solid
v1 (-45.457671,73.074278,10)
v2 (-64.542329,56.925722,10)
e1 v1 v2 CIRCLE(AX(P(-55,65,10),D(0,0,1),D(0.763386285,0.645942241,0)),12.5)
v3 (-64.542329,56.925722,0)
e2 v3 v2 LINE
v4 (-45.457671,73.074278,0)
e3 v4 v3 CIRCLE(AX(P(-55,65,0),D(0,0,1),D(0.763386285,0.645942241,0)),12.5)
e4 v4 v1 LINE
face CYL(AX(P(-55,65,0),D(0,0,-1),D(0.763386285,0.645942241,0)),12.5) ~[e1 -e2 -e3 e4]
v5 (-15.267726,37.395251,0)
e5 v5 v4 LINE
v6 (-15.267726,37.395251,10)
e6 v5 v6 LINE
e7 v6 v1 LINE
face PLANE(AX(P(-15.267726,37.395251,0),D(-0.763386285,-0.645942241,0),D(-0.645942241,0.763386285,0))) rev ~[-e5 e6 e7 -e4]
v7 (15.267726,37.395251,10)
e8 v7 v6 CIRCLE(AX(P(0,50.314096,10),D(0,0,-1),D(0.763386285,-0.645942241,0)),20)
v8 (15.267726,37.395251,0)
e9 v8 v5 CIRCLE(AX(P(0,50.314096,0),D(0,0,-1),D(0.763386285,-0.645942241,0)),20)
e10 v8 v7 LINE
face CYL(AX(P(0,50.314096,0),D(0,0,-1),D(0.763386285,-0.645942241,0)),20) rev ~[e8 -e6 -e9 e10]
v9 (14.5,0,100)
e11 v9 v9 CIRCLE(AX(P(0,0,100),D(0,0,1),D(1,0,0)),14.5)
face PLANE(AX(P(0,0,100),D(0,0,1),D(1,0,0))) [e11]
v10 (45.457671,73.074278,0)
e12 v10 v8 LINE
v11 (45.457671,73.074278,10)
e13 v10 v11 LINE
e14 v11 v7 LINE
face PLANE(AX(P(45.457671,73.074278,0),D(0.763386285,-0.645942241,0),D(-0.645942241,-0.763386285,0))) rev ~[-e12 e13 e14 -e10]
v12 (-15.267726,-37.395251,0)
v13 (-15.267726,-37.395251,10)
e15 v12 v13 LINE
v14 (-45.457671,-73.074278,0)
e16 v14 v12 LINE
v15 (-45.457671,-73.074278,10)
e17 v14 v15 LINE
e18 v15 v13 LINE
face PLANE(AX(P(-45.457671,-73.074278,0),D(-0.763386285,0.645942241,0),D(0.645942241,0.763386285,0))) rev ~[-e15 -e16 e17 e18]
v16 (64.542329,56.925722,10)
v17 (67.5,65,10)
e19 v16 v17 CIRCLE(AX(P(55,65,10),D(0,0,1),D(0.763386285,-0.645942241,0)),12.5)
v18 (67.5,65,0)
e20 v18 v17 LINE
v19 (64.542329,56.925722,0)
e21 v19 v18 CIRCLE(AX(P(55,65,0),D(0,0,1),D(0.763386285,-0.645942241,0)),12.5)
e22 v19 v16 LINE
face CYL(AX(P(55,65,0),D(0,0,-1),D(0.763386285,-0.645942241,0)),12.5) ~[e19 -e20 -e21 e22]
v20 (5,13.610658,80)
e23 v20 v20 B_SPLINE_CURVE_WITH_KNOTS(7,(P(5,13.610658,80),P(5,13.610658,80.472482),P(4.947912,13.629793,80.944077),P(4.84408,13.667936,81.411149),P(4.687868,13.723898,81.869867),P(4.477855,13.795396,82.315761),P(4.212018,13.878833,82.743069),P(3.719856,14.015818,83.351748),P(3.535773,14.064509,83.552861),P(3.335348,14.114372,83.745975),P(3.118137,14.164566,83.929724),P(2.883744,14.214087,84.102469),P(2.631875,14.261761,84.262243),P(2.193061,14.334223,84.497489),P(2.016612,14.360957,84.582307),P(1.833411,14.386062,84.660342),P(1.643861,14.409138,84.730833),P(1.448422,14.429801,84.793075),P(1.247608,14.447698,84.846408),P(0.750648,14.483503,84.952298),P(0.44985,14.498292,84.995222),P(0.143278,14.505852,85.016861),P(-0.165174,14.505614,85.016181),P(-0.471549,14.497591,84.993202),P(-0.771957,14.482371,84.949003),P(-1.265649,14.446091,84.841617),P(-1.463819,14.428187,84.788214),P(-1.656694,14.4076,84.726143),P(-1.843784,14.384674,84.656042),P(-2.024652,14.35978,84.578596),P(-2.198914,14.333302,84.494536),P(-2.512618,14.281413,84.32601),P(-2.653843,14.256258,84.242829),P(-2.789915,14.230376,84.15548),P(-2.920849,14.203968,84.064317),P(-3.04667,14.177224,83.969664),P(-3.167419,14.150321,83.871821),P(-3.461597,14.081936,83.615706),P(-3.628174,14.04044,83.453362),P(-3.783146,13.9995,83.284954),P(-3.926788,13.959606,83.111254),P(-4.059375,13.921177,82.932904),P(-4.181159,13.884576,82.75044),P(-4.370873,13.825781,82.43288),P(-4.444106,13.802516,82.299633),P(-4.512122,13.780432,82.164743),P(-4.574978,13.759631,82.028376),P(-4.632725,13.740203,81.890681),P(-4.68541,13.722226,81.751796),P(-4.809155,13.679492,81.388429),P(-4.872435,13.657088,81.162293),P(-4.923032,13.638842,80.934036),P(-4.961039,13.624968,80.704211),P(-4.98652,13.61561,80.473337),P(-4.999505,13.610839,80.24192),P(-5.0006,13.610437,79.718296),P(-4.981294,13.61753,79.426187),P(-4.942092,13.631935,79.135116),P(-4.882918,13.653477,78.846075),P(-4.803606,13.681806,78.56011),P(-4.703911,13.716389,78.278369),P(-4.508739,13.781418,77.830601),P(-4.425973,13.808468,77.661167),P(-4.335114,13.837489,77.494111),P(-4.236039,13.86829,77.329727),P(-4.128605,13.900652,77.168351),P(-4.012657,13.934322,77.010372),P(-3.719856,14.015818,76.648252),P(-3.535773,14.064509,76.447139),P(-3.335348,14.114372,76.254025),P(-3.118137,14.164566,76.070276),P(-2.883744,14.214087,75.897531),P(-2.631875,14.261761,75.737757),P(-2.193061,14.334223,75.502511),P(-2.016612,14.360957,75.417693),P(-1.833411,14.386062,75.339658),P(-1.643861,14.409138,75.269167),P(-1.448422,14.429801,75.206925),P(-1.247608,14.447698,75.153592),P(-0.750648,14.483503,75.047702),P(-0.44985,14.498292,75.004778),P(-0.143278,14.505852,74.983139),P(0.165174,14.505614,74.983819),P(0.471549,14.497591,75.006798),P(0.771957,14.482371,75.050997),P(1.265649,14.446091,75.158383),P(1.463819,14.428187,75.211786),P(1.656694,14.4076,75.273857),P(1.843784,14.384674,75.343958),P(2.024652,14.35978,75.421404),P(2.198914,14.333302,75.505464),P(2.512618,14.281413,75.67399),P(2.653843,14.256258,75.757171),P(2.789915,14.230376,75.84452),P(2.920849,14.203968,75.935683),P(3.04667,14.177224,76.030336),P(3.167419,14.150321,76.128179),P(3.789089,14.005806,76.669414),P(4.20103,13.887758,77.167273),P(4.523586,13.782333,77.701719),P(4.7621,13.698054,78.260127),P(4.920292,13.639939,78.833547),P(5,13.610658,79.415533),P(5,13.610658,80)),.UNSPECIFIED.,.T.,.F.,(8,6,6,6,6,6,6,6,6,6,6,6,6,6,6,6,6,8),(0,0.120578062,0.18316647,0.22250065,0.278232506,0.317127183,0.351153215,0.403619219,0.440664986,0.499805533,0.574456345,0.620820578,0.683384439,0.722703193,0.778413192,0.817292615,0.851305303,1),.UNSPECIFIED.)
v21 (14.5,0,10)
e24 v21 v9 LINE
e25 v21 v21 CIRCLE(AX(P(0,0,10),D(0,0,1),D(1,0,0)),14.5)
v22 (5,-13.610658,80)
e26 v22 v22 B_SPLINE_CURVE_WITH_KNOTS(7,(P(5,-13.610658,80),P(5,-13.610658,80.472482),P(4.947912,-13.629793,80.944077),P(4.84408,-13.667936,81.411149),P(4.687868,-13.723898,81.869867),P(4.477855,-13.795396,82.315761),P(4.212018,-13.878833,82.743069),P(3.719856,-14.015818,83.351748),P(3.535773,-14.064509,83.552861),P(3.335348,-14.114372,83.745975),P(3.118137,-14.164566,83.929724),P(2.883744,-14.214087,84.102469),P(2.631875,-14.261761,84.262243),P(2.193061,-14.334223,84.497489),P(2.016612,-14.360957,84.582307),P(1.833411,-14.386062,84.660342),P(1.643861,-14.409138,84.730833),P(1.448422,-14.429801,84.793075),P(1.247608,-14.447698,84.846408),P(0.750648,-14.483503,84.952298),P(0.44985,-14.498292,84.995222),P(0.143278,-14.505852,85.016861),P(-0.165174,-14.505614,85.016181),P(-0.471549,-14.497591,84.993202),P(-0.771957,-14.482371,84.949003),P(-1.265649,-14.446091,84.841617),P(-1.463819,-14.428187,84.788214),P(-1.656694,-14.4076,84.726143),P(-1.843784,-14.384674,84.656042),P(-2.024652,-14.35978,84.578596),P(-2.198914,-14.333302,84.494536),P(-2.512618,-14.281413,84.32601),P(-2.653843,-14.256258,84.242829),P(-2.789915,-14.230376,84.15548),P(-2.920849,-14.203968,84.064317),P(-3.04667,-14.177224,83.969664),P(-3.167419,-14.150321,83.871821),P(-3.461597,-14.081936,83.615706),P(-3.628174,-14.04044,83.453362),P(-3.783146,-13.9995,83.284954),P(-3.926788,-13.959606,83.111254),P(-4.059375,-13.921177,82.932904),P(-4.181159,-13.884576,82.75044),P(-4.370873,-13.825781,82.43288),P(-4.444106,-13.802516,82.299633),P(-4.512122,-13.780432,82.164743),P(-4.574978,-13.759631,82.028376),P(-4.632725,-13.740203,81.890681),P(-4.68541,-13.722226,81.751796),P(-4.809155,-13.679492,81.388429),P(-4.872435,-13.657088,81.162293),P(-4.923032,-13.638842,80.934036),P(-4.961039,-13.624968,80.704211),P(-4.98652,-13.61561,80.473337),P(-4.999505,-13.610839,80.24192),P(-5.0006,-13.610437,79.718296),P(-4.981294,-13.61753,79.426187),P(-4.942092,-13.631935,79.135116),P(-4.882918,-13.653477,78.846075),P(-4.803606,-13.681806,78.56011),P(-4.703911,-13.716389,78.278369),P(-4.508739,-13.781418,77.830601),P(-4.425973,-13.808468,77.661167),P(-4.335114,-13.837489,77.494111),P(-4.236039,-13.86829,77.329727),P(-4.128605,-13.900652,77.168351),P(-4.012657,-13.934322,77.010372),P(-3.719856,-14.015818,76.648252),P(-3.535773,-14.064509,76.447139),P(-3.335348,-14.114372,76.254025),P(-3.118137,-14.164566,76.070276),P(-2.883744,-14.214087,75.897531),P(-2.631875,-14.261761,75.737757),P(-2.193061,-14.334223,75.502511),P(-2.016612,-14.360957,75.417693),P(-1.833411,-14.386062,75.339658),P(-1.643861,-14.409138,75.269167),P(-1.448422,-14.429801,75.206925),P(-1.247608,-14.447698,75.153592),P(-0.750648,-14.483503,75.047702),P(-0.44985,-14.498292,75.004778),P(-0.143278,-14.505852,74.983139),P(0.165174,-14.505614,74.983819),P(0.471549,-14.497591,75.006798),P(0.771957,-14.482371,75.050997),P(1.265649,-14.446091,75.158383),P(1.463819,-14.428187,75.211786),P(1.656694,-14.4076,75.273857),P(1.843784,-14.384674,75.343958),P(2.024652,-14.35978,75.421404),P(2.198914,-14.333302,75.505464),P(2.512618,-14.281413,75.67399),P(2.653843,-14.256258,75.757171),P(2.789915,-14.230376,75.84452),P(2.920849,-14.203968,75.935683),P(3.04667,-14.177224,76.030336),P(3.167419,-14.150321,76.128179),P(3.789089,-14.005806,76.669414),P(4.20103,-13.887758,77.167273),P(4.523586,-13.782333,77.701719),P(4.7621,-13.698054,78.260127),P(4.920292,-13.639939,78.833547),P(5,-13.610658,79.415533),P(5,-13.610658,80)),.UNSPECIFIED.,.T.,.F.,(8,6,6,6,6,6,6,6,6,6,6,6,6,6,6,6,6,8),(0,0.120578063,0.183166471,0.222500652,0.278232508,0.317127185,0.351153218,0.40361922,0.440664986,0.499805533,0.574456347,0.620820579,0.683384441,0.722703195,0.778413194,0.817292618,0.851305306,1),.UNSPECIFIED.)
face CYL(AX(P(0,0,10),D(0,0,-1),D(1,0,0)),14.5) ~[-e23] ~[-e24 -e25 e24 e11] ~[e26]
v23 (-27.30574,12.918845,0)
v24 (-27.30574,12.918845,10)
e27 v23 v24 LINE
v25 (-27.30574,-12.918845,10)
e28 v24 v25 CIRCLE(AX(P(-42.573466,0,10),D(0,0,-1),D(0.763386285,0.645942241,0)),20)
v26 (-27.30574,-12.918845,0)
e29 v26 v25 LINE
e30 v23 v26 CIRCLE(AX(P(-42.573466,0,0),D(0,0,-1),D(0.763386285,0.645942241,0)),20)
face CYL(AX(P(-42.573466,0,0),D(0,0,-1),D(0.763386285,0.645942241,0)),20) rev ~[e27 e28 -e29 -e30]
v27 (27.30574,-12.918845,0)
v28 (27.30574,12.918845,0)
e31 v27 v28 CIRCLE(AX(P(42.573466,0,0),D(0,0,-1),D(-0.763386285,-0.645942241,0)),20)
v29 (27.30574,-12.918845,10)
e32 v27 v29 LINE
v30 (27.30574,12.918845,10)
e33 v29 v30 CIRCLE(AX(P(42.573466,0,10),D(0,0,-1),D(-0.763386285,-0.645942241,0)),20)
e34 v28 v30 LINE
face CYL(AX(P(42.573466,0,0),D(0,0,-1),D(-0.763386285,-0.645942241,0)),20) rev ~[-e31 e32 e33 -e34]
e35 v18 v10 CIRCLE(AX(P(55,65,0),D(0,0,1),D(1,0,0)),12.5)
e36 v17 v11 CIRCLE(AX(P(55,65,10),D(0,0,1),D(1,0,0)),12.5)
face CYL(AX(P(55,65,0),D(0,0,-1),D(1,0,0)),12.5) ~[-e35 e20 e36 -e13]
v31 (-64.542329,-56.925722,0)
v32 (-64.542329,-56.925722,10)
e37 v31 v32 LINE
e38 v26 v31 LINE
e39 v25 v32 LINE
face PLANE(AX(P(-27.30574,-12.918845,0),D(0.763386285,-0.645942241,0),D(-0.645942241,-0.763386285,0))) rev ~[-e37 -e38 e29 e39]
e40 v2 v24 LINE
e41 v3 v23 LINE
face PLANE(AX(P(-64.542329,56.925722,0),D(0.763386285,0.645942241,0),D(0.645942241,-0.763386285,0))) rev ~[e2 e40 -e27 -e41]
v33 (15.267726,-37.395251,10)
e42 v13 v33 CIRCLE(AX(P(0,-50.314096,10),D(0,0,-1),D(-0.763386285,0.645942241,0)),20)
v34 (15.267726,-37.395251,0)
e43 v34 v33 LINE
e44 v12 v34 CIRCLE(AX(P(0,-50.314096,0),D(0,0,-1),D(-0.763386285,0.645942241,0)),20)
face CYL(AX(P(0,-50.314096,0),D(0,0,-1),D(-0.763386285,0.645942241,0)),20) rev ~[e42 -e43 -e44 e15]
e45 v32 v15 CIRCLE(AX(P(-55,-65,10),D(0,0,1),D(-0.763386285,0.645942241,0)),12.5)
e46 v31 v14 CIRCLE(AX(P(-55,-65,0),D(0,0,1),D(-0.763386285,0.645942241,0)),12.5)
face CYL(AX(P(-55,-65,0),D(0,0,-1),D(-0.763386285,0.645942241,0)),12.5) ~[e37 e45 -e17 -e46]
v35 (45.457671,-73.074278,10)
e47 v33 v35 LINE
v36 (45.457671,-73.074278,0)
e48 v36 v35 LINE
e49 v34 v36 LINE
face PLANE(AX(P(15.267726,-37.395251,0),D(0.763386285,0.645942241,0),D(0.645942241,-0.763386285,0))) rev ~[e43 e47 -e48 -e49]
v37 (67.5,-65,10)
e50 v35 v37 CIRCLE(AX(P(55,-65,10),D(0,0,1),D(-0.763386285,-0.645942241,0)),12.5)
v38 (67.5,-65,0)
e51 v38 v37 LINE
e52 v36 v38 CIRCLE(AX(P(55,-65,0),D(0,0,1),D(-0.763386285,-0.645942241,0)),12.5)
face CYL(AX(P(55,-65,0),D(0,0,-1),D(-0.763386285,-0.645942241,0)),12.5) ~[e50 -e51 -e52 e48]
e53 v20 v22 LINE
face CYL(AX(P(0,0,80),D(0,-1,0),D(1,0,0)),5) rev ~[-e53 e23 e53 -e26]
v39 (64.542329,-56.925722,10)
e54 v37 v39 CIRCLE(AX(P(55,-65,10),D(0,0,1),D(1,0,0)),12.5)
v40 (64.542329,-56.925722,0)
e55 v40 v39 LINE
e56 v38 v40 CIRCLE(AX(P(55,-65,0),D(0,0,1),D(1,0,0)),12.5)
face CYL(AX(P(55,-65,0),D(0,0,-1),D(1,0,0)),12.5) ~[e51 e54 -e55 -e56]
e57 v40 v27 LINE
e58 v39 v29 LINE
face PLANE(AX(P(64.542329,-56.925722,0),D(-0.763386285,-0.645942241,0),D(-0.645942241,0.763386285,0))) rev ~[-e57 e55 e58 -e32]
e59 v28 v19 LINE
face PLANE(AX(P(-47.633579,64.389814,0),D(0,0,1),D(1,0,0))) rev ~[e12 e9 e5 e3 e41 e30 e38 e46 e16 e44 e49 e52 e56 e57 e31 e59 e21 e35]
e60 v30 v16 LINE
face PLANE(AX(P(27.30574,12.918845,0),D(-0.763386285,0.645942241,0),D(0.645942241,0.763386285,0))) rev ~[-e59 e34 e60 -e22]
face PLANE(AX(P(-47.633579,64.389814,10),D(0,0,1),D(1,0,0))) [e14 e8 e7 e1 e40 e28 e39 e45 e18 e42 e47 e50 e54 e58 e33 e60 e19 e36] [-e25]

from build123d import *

# Parameters (mm, degrees)
F1_DEPTH = 10
F3_R     = 14.5
F4_DEPTH = 90
F2_R     = 5
F5_DEPTH = 25


# Not quite as in the source:
# - a feature names something its author has since deleted; it is built from what else it names


with BuildPart() as f1:
    # F0 (on Top) → F1 (new body)
    with BuildSketch(Plane.XY):
        with BuildLine():
            Line((-45.4576714329, 73.0742780183), (-55, 65))
            Line((-55, 65), (-46.9257219817, 55.4576714329))
            ThreePointArc((-46.9257219817, 55.4576714329), (-43.6602805319, 59.7406500035), (-42.5, 65))
            ThreePointArc((-42.5, 65), (-43.2626854202, 69.2994704855), (-45.4576714329, 73.0742780183))
        make_face()
        with BuildLine():
            Line((-46.9257219817, 55.4576714329), (-55, 65))
            Line((-55, 65), (-64.5423285671, 56.9257219817))
            ThreePointArc((-64.5423285671, 56.9257219817), (-56.0380684982, 52.5431780219), (-46.9257219817, 55.4576714329))
        make_face()
        with BuildLine():
            Line((-64.5423285671, 56.9257219817), (-55, 65))
            Line((-55, 65), (-45.4576714329, 73.0742780183))
            ThreePointArc((-45.4576714329, 73.0742780183), (-63.0742780183, 74.5423285671), (-64.5423285671, 56.9257219817))
        make_face()
        with BuildLine():
            ThreePointArc((-42.5, 65), (-43.6602805319, 59.7406500035), (-46.9257219817, 55.4576714329))
            Line((-46.9257219817, 55.4576714329), (-9.3661625013, 11.0691011379))
            ThreePointArc((-9.3661625013, 11.0691011379), (0, 14.5), (9.3661625013, 11.0691011379))
            Line((9.3661625013, 11.0691011379), (46.9257219817, 55.4576714329))
            ThreePointArc((46.9257219817, 55.4576714329), (42.5431780219, 63.9619315018), (45.4576714329, 73.0742780183))
            Line((45.4576714329, 73.0742780183), (15.2677257074, 37.3952512518))
            ThreePointArc((15.2677257074, 37.3952512518), (0, 30.3140960811), (-15.2677257074, 37.3952512518))
            Line((-15.2677257074, 37.3952512518), (-45.4576714329, 73.0742780183))
            ThreePointArc((-45.4576714329, 73.0742780183), (-43.2626854202, 69.2994704855), (-42.5, 65))
        make_face()
        with BuildLine():
            Line((-9.3661625013, 11.0691011379), (-46.9257219817, 55.4576714329))
            ThreePointArc((-46.9257219817, 55.4576714329), (-56.0380684982, 52.5431780219), (-64.5423285671, 56.9257219817))
            Line((-64.5423285671, 56.9257219817), (-27.3057402074, 12.9188448293))
            ThreePointArc((-27.3057402074, 12.9188448293), (-22.5734659148, 0), (-27.3057402074, -12.9188448293))
            Line((-27.3057402074, -12.9188448293), (-64.5423285671, -56.9257219817))
            ThreePointArc((-64.5423285671, -56.9257219817), (-56.0380684982, -52.5431780219), (-46.9257219817, -55.4576714329))
            Line((-46.9257219817, -55.4576714329), (-9.3661625013, -11.0691011379))
            ThreePointArc((-9.3661625013, -11.0691011379), (-14.5, 0), (-9.3661625013, 11.0691011379))
        make_face()
        with BuildLine():
            ThreePointArc((9.3661625013, 11.0691011379), (0, 14.5), (-9.3661625013, 11.0691011379))
            Line((-9.3661625013, 11.0691011379), (0, 0))
            Line((0, 0), (9.3661625013, 11.0691011379))
        make_face()
        with BuildLine():
            Line((0, 0), (-9.3661625013, 11.0691011379))
            ThreePointArc((-9.3661625013, 11.0691011379), (-14.5, 0), (-9.3661625013, -11.0691011379))
            Line((-9.3661625013, -11.0691011379), (0, 0))
        make_face()
        with BuildLine():
            Line((9.3661625013, 11.0691011379), (0, 0))
            Line((0, 0), (9.3661625013, -11.0691011379))
            ThreePointArc((9.3661625013, -11.0691011379), (13.154074583, -6.1008459959), (14.5, 0))
            ThreePointArc((14.5, 0), (13.154074583, 6.1008459959), (9.3661625013, 11.0691011379))
        make_face()
        with BuildLine():
            Line((9.3661625013, -11.0691011379), (0, 0))
            Line((0, 0), (-9.3661625013, -11.0691011379))
            ThreePointArc((-9.3661625013, -11.0691011379), (0, -14.5), (9.3661625013, -11.0691011379))
        make_face()
        with BuildLine():
            Line((46.9257219817, 55.4576714329), (9.3661625013, 11.0691011379))
            ThreePointArc((9.3661625013, 11.0691011379), (13.154074583, 6.1008459959), (14.5, 0))
            ThreePointArc((14.5, 0), (13.154074583, -6.1008459959), (9.3661625013, -11.0691011379))
            Line((9.3661625013, -11.0691011379), (46.9257219817, -55.4576714329))
            ThreePointArc((46.9257219817, -55.4576714329), (56.0380684982, -52.5431780219), (64.5423285671, -56.9257219817))
            Line((64.5423285671, -56.9257219817), (27.3057402074, -12.9188448293))
            ThreePointArc((27.3057402074, -12.9188448293), (22.5734659148, 0), (27.3057402074, 12.9188448293))
            Line((27.3057402074, 12.9188448293), (64.5423285671, 56.9257219817))
            ThreePointArc((64.5423285671, 56.9257219817), (56.0380684982, 52.5431780219), (46.9257219817, 55.4576714329))
        make_face()
        with BuildLine():
            ThreePointArc((9.3661625013, -11.0691011379), (0, -14.5), (-9.3661625013, -11.0691011379))
            Line((-9.3661625013, -11.0691011379), (-46.9257219817, -55.4576714329))
            ThreePointArc((-46.9257219817, -55.4576714329), (-43.6602805319, -59.7406500035), (-42.5, -65))
            ThreePointArc((-42.5, -65), (-43.2626854202, -69.2994704855), (-45.4576714329, -73.0742780183))
            Line((-45.4576714329, -73.0742780183), (-15.2677257074, -37.3952512518))
            ThreePointArc((-15.2677257074, -37.3952512518), (0, -30.3140960811), (15.2677257074, -37.3952512518))
            Line((15.2677257074, -37.3952512518), (45.4576714329, -73.0742780183))
            ThreePointArc((45.4576714329, -73.0742780183), (42.5431780219, -63.9619315018), (46.9257219817, -55.4576714329))
            Line((46.9257219817, -55.4576714329), (9.3661625013, -11.0691011379))
        make_face()
        with BuildLine():
            ThreePointArc((45.4576714329, 73.0742780183), (42.5431780219, 63.9619315018), (46.9257219817, 55.4576714329))
            Line((46.9257219817, 55.4576714329), (55, 65))
            Line((55, 65), (45.4576714329, 73.0742780183))
        make_face()
        with BuildLine():
            Line((55, 65), (46.9257219817, 55.4576714329))
            ThreePointArc((46.9257219817, 55.4576714329), (56.0380684982, 52.5431780219), (64.5423285671, 56.9257219817))
            Line((64.5423285671, 56.9257219817), (55, 65))
        make_face()
        with BuildLine():
            ThreePointArc((-42.5, -65), (-43.6602805319, -59.7406500035), (-46.9257219817, -55.4576714329))
            Line((-46.9257219817, -55.4576714329), (-55, -65))
            Line((-55, -65), (-45.4576714329, -73.0742780183))
            ThreePointArc((-45.4576714329, -73.0742780183), (-43.2626854202, -69.2994704855), (-42.5, -65))
        make_face()
        with BuildLine():
            Line((-55, -65), (-46.9257219817, -55.4576714329))
            ThreePointArc((-46.9257219817, -55.4576714329), (-56.0380684982, -52.5431780219), (-64.5423285671, -56.9257219817))
            Line((-64.5423285671, -56.9257219817), (-55, -65))
        make_face()
        with BuildLine():
            Line((-55, -65), (-64.5423285671, -56.9257219817))
            ThreePointArc((-64.5423285671, -56.9257219817), (-63.0742780183, -74.5423285671), (-45.4576714329, -73.0742780183))
            Line((-45.4576714329, -73.0742780183), (-55, -65))
        make_face()
        with BuildLine():
            ThreePointArc((67.5, 65), (59.2994704855, 76.7373145798), (45.4576714329, 73.0742780183))
            Line((45.4576714329, 73.0742780183), (55, 65))
            Line((55, 65), (64.5423285671, 56.9257219817))
            ThreePointArc((64.5423285671, 56.9257219817), (66.7373145798, 60.7005295145), (67.5, 65))
        make_face()
        with BuildLine():
            ThreePointArc((64.5423285671, -56.9257219817), (56.0380684982, -52.5431780219), (46.9257219817, -55.4576714329))
            Line((46.9257219817, -55.4576714329), (55, -65))
            Line((55, -65), (64.5423285671, -56.9257219817))
        make_face()
        with BuildLine():
            Line((55, -65), (46.9257219817, -55.4576714329))
            ThreePointArc((46.9257219817, -55.4576714329), (42.5431780219, -63.9619315018), (45.4576714329, -73.0742780183))
            Line((45.4576714329, -73.0742780183), (55, -65))
        make_face()
        with BuildLine():
            Line((64.5423285671, -56.9257219817), (55, -65))
            Line((55, -65), (45.4576714329, -73.0742780183))
            ThreePointArc((45.4576714329, -73.0742780183), (59.2994704855, -76.7373145798), (67.5, -65))
            ThreePointArc((67.5, -65), (66.7373145798, -60.7005295145), (64.5423285671, -56.9257219817))
        make_face()
    extrude(amount=F1_DEPTH)

    # F3 (on face) → F4 (join)
    with BuildSketch(Plane.XY.offset(10)):
        Circle(F3_R)
    extrude(amount=F4_DEPTH)

    # F2 (on Front) → F5 (cut, symmetric)
    with BuildSketch(Plane.XZ):
        with Locations((0, 80)):
            Circle(F2_R)
    extrude(amount=F5_DEPTH, both=True, mode=Mode.SUBTRACT)


solid = f1.part
